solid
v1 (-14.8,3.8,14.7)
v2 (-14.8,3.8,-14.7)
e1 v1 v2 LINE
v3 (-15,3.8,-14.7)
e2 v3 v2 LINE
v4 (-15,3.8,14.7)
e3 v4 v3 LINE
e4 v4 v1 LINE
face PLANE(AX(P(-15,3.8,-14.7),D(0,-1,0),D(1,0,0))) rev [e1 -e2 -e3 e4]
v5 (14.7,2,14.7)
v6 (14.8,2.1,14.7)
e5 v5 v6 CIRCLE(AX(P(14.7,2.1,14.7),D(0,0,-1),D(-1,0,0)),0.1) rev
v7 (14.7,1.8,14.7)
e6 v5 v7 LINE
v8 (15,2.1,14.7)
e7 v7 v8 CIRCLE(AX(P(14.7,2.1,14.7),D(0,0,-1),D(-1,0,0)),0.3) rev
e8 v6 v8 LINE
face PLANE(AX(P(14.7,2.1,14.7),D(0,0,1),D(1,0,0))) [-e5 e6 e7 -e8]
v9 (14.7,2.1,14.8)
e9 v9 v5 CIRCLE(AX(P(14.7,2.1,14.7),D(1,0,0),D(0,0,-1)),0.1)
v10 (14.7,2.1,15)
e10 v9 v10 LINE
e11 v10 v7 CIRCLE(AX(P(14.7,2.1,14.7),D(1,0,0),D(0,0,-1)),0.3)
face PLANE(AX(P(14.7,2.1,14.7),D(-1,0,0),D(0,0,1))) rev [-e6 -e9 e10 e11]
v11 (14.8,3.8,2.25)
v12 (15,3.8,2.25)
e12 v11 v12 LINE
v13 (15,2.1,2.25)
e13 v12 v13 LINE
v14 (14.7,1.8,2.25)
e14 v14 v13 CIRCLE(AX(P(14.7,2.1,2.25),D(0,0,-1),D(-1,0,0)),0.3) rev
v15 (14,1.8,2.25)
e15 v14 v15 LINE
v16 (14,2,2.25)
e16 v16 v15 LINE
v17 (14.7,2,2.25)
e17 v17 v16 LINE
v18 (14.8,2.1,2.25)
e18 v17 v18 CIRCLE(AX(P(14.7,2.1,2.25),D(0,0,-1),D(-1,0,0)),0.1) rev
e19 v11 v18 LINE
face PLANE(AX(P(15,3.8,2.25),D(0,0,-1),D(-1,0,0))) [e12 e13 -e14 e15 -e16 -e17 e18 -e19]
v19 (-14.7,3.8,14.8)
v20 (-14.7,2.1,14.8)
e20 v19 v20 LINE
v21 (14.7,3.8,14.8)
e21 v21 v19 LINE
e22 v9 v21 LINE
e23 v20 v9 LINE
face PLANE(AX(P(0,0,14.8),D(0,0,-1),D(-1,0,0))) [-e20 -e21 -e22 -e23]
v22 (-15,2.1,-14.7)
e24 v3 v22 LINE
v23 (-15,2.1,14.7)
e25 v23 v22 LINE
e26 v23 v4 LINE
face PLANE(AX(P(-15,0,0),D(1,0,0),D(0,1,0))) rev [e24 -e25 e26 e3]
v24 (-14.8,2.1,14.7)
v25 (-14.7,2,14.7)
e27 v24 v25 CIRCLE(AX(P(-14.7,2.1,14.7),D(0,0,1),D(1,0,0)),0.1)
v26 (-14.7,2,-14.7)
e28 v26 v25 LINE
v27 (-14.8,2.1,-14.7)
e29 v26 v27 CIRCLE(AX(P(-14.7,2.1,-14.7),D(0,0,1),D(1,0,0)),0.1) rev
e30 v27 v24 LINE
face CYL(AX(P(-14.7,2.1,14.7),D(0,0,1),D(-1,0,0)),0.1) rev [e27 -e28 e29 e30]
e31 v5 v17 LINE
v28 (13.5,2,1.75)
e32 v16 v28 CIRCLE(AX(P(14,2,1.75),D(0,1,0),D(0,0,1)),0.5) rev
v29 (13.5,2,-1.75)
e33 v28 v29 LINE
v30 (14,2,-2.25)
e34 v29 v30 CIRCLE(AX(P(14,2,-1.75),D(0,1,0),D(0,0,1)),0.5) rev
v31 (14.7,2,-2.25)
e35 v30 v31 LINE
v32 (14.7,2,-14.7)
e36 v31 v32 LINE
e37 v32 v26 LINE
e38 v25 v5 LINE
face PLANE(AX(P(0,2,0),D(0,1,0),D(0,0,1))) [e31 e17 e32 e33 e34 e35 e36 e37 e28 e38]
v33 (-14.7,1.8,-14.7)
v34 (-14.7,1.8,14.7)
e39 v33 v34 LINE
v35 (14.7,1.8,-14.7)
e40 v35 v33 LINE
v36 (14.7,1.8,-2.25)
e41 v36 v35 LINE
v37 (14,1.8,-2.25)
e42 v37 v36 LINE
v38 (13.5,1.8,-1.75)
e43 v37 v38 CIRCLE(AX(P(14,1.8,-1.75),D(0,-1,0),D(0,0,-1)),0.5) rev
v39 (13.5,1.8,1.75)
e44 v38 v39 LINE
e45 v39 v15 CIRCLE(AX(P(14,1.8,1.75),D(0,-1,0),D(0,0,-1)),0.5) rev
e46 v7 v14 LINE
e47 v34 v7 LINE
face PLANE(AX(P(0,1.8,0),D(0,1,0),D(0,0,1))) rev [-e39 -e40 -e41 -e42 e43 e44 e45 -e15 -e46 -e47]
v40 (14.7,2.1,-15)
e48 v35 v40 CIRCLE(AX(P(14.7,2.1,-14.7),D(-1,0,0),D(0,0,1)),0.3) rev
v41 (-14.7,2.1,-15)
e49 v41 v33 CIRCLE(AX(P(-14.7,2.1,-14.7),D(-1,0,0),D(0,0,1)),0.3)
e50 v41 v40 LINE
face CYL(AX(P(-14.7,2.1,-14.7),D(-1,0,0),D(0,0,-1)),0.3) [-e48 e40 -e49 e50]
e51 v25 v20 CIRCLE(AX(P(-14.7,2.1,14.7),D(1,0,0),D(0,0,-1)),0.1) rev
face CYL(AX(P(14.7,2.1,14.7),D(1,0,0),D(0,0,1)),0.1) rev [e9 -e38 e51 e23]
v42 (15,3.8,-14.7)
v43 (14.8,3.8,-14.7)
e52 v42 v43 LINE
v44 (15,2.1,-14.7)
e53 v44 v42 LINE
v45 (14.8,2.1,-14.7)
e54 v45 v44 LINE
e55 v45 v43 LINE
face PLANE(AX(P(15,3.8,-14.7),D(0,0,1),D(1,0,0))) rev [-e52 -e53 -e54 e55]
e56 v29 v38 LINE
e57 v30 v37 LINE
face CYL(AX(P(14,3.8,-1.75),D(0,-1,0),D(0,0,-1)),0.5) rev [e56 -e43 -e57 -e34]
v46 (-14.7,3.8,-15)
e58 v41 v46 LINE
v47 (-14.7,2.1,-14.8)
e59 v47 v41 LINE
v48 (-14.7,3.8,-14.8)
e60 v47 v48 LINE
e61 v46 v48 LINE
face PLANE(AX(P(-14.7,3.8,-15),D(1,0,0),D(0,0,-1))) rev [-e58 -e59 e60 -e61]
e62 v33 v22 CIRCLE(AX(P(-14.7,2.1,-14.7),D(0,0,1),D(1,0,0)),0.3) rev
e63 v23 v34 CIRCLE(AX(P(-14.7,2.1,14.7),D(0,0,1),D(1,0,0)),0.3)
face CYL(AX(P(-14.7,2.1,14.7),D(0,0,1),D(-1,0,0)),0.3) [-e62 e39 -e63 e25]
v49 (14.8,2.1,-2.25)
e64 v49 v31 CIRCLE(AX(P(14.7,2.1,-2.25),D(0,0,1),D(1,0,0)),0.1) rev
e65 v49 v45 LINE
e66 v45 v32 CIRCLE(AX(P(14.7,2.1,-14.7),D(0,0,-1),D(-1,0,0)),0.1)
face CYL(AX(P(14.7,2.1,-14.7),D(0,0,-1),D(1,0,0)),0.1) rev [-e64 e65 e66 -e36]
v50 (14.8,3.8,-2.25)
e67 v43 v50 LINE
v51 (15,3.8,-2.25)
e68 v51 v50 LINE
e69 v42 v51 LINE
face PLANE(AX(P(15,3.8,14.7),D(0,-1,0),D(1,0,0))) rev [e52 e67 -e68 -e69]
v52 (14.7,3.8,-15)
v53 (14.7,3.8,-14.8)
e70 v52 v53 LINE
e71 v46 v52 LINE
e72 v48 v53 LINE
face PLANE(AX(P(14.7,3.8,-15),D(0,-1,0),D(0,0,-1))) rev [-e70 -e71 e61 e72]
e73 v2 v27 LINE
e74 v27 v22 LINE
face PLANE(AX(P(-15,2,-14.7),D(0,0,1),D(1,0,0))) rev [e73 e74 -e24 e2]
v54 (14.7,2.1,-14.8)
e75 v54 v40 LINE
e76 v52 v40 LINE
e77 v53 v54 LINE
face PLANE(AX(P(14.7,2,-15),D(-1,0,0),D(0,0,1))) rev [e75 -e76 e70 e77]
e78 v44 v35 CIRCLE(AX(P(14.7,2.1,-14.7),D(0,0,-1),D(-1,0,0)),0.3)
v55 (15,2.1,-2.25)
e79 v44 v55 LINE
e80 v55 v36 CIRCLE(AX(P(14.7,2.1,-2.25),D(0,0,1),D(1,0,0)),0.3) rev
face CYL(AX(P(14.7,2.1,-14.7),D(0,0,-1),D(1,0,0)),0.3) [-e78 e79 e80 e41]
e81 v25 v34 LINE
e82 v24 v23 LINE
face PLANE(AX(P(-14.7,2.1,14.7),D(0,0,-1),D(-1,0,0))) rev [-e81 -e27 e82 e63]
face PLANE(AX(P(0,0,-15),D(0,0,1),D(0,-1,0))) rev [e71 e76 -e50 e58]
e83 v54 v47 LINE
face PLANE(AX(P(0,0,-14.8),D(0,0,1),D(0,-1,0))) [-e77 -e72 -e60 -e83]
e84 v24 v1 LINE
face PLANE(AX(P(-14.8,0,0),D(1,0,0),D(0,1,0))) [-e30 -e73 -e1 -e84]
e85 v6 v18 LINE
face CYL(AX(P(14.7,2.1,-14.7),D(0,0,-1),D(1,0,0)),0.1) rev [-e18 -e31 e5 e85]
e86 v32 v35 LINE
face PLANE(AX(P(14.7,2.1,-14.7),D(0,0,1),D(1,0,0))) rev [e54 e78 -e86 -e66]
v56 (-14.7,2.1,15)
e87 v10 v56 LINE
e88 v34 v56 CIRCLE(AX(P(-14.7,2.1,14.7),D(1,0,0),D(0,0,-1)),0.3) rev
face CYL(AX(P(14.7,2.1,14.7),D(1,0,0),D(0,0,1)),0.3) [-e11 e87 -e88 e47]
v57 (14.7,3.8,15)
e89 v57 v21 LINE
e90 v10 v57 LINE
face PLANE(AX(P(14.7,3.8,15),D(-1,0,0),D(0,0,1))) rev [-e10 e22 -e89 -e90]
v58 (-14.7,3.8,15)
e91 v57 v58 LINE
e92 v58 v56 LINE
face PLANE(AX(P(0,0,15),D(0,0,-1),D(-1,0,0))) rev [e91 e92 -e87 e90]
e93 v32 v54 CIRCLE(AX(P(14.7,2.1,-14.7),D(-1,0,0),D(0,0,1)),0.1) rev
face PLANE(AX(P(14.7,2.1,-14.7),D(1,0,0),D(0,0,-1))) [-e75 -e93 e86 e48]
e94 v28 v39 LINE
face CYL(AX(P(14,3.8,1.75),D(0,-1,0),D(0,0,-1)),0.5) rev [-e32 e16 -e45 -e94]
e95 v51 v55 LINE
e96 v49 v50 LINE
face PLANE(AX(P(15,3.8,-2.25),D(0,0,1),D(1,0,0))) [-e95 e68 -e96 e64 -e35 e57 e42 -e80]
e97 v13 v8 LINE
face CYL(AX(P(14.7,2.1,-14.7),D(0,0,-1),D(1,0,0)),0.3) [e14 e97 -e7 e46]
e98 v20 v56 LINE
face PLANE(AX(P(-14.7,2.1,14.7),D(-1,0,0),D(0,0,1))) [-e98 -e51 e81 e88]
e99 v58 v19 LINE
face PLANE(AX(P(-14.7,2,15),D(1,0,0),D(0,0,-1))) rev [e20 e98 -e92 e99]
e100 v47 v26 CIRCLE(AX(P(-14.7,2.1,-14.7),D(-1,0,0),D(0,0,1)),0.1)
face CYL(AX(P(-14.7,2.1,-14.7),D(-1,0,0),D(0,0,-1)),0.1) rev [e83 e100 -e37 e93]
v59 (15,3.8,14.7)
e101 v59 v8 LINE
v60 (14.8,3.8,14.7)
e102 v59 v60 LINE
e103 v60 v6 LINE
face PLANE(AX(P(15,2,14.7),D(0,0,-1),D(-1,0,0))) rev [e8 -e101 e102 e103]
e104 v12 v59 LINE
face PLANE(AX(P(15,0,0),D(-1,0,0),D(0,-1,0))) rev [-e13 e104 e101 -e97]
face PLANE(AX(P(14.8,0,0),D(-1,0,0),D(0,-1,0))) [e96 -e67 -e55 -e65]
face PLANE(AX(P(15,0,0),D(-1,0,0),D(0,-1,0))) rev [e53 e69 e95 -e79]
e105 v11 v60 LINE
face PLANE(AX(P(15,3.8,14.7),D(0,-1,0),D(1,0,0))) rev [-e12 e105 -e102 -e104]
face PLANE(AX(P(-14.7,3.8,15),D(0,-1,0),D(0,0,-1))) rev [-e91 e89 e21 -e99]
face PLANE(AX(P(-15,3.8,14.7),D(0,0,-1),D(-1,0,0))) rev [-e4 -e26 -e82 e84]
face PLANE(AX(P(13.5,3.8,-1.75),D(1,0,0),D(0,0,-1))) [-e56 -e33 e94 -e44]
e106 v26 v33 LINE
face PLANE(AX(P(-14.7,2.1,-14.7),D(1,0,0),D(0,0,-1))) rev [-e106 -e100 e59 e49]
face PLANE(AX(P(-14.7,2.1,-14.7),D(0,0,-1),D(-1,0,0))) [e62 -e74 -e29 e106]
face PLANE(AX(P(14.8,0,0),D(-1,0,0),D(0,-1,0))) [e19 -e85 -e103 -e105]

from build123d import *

# Parameters (mm, degrees)
BASES_W            = 29.4
BASES_H            = 29.4
BASE_DEPTH         = 0.2
EDGE_FLANGE1_DEPTH = 29.4
EDGE_FLANGE2_DEPTH = 29.4
EDGE_FLANGE3_DEPTH = 29.4
EDGE_FLANGE4_DEPTH = 29.4
VENT_DEPTH         = 42.363026969
VENT_DEPTH_BACK    = 42.363026969


# Sheet-metal steps are written as plain solids
with BuildPart() as part:
    # BaseS → Base (new body)
    with BuildSketch(Plane(origin=(0, 2, 0), x_dir=(1, 0, 0), z_dir=(0, 1, 0))):
        Rectangle(BASES_W, BASES_H)
    extrude(amount=-BASE_DEPTH)

    # Edge-Flange1 section (across the edge) → Edge-Flange1 (add)
    with BuildSketch(Plane(origin=(-14.7, 2, 14.8), x_dir=(0, 0, -1), z_dir=(1, 0, 0))):
        with BuildLine():
            Line((-0.2, 0.1), (-0.2, 1.8))
            Line((-0.2, 1.8), (0, 1.8))
            Line((0, 1.8), (0, 0.1))
            ThreePointArc((0, 0.1), (0.029289322, 0.029289322), (0.1, 0))
            Line((0.1, 0), (0.1, -0.2))
            ThreePointArc((0.1, -0.2), (-0.112132034, -0.112132034), (-0.2, 0.1))
        make_face()
    extrude(amount=EDGE_FLANGE1_DEPTH)

    # Edge-Flange2 section (across the edge) → Edge-Flange2 (add)
    with BuildSketch(Plane(origin=(14.7, 2, -14.8), x_dir=(0, 0, 1), z_dir=(-1, 0, 0))):
        with BuildLine():
            Line((-0.2, 0.1), (-0.2, 1.8))
            Line((-0.2, 1.8), (0, 1.8))
            Line((0, 1.8), (0, 0.1))
            ThreePointArc((0, 0.1), (0.029289322, 0.029289322), (0.1, 0))
            Line((0.1, 0), (0.1, -0.2))
            ThreePointArc((0.1, -0.2), (-0.112132034, -0.112132034), (-0.2, 0.1))
        make_face()
    extrude(amount=EDGE_FLANGE2_DEPTH)

    # Edge-Flange3 section (across the edge) → Edge-Flange3 (add)
    with BuildSketch(Plane(origin=(14.8, 2, 14.7), x_dir=(-1, 0, 0), z_dir=(0, 0, -1))):
        with BuildLine():
            Line((-0.2, 0.1), (-0.2, 1.8))
            Line((-0.2, 1.8), (0, 1.8))
            Line((0, 1.8), (0, 0.1))
            ThreePointArc((0, 0.1), (0.029289322, 0.029289322), (0.1, 0))
            Line((0.1, 0), (0.1, -0.2))
            ThreePointArc((0.1, -0.2), (-0.112132034, -0.112132034), (-0.2, 0.1))
        make_face()
    extrude(amount=EDGE_FLANGE3_DEPTH)

    # Edge-Flange4 section (across the edge) → Edge-Flange4 (add)
    with BuildSketch(Plane(origin=(-14.8, 2, -14.7), x_dir=(1, 0, 0), z_dir=(0, 0, 1))):
        with BuildLine():
            Line((-0.2, 0.1), (-0.2, 1.8))
            Line((-0.2, 1.8), (0, 1.8))
            Line((0, 1.8), (0, 0.1))
            ThreePointArc((0, 0.1), (0.029289322, 0.029289322), (0.1, 0))
            Line((0.1, 0), (0.1, -0.2))
            ThreePointArc((0.1, -0.2), (-0.112132034, -0.112132034), (-0.2, 0.1))
        make_face()
    extrude(amount=EDGE_FLANGE4_DEPTH)

    # VentS → Vent (cut, two sides: drawn at the far end of the back side and taken through both)
    with BuildSketch(Plane(origin=(-15.1, 1.8, -13.3), x_dir=(1, 0, 0), z_dir=(0, 1, 0)).offset(-VENT_DEPTH_BACK)):
        with BuildLine():
            Line((30.1, -11.05), (30.1, -15.55))
            Line((30.1, -15.55), (29.1, -15.55))
            ThreePointArc((29.1, -15.55), (28.746446609, -15.403553391), (28.6, -15.05))
            Line((28.6, -15.05), (28.6, -11.55))
            ThreePointArc((28.6, -11.55), (28.746446609, -11.196446609), (29.1, -11.05))
            Line((29.1, -11.05), (30.1, -11.05))
        make_face()
    extrude(amount=VENT_DEPTH + VENT_DEPTH_BACK, mode=Mode.SUBTRACT)


solid = part.part
